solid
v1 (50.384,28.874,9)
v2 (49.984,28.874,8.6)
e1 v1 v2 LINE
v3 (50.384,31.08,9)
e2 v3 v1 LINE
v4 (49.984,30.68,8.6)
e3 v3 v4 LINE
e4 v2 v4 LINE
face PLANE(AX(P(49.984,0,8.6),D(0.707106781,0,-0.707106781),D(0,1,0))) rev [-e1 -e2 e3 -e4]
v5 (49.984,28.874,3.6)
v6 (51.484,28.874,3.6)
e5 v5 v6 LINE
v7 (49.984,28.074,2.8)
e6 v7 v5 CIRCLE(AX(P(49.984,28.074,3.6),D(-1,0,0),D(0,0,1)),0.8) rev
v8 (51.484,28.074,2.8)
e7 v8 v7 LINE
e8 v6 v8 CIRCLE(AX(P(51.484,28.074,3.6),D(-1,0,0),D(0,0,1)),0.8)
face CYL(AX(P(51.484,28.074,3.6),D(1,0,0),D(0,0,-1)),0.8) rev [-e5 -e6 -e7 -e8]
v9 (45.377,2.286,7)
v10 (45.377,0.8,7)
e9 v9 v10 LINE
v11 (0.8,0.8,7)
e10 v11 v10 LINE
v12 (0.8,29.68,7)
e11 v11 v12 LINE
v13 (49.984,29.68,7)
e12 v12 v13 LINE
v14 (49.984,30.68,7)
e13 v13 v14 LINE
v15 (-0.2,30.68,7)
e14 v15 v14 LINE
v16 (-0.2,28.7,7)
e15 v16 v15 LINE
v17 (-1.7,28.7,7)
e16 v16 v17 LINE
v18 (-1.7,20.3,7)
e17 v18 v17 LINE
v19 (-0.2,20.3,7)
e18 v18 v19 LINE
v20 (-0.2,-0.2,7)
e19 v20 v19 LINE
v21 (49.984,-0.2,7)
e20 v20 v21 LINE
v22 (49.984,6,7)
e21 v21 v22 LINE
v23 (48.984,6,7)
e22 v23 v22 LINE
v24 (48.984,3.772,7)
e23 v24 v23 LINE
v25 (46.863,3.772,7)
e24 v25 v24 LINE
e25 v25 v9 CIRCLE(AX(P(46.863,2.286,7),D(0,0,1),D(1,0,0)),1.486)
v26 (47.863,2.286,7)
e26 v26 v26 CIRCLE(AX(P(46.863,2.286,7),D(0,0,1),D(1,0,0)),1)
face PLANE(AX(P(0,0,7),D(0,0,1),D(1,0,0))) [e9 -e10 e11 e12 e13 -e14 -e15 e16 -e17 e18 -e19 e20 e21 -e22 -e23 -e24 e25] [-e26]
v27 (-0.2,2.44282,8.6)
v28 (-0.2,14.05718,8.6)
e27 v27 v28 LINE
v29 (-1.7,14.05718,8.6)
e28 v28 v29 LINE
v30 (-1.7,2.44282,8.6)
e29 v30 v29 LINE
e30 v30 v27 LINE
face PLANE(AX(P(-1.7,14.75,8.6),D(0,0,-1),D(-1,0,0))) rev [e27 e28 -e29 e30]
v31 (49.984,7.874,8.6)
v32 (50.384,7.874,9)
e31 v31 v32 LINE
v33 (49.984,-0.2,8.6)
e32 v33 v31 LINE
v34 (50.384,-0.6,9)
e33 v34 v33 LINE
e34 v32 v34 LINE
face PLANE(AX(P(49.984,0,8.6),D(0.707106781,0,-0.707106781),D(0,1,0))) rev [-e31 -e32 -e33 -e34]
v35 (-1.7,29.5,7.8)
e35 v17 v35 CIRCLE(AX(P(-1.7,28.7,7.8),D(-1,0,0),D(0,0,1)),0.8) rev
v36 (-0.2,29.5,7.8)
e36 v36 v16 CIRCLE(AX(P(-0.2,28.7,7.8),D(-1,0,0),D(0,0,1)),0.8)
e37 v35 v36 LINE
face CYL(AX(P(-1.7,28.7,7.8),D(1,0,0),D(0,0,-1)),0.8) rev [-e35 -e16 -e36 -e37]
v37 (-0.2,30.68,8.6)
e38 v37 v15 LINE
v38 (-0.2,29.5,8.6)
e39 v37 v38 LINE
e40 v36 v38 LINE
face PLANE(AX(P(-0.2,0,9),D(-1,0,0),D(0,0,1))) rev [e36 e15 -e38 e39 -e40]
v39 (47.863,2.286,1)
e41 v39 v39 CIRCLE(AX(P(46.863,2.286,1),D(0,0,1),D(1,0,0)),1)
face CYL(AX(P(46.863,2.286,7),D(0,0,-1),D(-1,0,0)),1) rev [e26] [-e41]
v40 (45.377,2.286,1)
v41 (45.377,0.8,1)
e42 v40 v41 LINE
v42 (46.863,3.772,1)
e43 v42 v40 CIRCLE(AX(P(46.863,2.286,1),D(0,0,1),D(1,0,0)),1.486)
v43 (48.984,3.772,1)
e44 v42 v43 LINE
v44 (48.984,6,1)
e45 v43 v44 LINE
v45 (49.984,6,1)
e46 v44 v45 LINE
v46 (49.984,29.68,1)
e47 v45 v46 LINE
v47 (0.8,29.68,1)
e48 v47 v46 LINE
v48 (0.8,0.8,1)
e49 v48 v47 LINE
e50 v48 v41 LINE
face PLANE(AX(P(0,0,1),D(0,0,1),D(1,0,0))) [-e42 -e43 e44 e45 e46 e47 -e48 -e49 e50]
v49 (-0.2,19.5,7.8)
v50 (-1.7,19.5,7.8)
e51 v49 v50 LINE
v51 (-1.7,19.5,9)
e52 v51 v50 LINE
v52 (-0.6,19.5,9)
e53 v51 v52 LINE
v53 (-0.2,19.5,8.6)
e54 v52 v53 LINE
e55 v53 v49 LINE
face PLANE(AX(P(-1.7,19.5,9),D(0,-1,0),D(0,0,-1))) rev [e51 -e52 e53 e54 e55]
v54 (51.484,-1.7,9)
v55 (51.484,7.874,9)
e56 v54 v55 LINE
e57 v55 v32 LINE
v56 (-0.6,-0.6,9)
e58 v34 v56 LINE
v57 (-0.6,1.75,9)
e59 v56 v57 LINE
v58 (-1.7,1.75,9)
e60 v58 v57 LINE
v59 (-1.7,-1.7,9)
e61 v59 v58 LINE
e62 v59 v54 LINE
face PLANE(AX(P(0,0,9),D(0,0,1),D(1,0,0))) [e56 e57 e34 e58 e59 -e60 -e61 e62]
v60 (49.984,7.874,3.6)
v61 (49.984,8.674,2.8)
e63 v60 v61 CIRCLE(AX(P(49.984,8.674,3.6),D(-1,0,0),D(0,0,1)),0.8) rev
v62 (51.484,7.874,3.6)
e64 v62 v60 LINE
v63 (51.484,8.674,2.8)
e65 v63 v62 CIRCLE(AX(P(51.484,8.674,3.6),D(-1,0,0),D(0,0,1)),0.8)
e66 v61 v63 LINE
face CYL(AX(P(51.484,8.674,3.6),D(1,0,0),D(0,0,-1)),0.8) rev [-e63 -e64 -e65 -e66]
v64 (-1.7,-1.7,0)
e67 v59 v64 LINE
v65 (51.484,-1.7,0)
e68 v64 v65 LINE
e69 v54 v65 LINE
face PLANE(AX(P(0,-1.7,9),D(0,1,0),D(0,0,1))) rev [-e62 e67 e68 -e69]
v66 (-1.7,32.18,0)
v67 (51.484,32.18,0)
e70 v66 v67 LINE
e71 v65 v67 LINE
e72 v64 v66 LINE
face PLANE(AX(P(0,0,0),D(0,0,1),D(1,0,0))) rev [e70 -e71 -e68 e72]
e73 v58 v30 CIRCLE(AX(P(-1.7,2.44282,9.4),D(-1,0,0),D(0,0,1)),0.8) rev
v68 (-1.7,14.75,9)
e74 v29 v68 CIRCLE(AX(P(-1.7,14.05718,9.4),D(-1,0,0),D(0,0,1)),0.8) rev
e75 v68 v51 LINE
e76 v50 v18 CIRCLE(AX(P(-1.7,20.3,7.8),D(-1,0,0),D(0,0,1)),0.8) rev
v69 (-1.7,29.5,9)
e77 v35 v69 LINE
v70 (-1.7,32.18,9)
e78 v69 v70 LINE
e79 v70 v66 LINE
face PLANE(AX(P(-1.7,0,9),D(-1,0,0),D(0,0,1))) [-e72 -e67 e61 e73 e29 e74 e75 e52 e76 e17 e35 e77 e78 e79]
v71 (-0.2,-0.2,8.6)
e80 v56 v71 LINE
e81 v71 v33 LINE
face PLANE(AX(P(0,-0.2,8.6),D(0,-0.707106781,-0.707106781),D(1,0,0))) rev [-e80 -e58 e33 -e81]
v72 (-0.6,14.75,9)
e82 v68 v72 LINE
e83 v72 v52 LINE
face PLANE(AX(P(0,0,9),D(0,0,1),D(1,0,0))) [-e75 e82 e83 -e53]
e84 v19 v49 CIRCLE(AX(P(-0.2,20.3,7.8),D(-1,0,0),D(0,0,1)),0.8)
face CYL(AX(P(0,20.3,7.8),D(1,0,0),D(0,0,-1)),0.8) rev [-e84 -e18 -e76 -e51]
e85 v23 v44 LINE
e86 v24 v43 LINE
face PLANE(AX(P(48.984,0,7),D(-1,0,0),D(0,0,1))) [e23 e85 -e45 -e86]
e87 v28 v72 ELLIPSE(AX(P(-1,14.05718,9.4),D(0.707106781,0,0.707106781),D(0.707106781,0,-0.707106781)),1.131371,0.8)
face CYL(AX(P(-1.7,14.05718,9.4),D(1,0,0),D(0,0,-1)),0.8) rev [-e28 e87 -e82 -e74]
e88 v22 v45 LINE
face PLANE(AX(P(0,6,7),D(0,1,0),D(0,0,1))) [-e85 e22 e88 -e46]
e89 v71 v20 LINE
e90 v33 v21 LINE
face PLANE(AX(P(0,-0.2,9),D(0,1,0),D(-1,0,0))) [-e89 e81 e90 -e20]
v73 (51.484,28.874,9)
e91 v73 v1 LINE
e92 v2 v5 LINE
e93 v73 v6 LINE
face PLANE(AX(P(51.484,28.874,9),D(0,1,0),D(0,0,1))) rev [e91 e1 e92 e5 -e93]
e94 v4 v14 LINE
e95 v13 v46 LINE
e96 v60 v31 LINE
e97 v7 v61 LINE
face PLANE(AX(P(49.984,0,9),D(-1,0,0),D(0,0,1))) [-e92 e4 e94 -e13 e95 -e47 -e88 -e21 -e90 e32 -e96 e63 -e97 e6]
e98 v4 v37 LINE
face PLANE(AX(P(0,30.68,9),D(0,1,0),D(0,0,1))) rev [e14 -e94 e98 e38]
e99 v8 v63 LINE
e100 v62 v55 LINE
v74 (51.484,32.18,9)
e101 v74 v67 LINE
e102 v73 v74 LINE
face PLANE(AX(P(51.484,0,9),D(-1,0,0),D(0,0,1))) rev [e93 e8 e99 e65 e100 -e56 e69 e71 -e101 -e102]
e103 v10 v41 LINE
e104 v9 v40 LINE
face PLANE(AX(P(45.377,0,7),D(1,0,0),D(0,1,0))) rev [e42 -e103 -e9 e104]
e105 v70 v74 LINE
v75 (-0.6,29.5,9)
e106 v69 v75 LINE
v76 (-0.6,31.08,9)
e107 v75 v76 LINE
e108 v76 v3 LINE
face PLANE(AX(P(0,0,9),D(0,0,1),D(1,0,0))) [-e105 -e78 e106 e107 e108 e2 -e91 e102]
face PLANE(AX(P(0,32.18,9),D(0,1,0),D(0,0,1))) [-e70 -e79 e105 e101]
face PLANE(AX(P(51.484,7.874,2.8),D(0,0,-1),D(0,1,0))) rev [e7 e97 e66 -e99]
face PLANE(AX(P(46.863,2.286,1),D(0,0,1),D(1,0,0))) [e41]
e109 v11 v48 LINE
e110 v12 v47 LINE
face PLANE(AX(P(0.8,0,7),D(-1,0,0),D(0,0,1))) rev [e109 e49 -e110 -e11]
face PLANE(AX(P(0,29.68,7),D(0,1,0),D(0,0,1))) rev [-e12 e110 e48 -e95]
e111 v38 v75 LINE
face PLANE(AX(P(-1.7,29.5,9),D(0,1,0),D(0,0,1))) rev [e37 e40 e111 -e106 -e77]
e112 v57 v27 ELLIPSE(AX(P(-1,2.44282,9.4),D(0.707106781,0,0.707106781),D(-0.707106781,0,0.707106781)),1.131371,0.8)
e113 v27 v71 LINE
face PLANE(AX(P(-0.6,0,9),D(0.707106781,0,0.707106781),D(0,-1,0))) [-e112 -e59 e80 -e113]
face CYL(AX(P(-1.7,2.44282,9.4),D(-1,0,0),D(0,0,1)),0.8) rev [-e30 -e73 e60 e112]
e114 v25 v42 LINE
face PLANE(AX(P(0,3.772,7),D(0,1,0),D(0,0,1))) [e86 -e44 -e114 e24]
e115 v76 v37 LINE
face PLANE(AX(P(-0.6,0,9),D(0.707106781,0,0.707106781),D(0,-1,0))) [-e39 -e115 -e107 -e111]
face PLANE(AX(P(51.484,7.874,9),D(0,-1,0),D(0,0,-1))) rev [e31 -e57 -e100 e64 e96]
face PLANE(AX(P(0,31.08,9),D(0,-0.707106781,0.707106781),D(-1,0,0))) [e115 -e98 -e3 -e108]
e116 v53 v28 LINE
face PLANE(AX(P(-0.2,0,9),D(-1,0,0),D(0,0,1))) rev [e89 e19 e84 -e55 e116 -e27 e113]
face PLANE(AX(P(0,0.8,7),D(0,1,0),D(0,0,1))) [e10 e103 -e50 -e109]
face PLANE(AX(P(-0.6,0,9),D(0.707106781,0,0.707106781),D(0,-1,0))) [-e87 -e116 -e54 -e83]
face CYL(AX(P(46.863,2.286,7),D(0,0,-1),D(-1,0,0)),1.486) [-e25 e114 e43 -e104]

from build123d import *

# Parameters (mm, degrees)
EXTRUDE_1_DEPTH     = 1
SKETCH_1_R          = 1
EXTRUDE_1_2_DEPTH   = 1
SKETCH_1_3_R        = 1.486
SKETCH_1_3_R_2      = 1
EXTRUDE_2_DEPTH     = 7
SKETCH_1_4_W        = 53.184
SKETCH_1_4_H        = 33.88
SKETCH_1_4_W_2      = 50.184
SKETCH_1_4_H_2      = 30.88
EXTRUDE_3_DEPTH     = 9
SKETCH_2_W          = 6.2
SKETCH_2_H          = 21
CUT_EXTRUDE_1_DEPTH = 62.545010001
SKETCH_3_W          = 2
SKETCH_3_H          = 10
CUT_EXTRUDE_2_DEPTH = 62.545010001
SKETCH_4_W          = 0.4
SKETCH_4_H          = 13
CUT_EXTRUDE_3_DEPTH = 62.545010001
FILLET_1_R          = 0.8
CHAMFER_1_SIZE      = 0.4


# Some blends are built 0.0001 mm under size
with BuildPart() as part:
    # Эскиз1 → Бобышка-Вытянуть1 (new body)
    with BuildSketch(Plane.XY):
        with BuildLine():
            Line((48.984, 3.772), (48.984, 6))
            Line((48.984, 6), (49.984, 6))
            Line((49.984, 6), (49.984, 29.68))
            Line((49.984, 29.68), (0.8, 29.68))
            Line((0.8, 29.68), (0.8, 0.8))
            Line((0.8, 0.8), (45.377, 0.8))
            Line((45.377, 0.8), (45.377, 2.286))
            ThreePointArc((45.377, 2.286), (45.812239323, 3.336760677), (46.863, 3.772))
            Line((46.863, 3.772), (48.984, 3.772))
        make_face()
    extrude(amount=EXTRUDE_1_DEPTH)



with BuildPart() as body_2:
    # Эскиз1 → Extrude 1 2 (new body)
    with BuildSketch(Plane.XY):
        with Locations((46.863, 2.286)):
            Circle(SKETCH_1_R)
    extrude(amount=EXTRUDE_1_2_DEPTH)


with BuildPart() as part_1:
    add(part.part)

    add(body_2.part)  # Бобышка-Вытянуть2 merges body 2
    # Эскиз1<3> → Бобышка-Вытянуть2 (add)
    # profile 1 of 4: a face of its own
    with BuildSketch(Plane.XY):
        Polygon((0.8, 29.68), (48.984, 29.68), (49.984, 29.68), (49.984, 30.68), (-0.2, 30.68), (-0.2, -0.2), (49.984, -0.2), (49.984, 6), (48.984, 6), (48.984, 3.772), (48.984, 0.8), (46.863, 0.8), (45.377, 0.8), (0.8, 0.8), align=None)
    # profile 2 of 4: a face of its own
    with BuildSketch(Plane.XY):
        with BuildLine():
            Line((48.984, 0.8), (48.984, 3.772))
            Line((48.984, 3.772), (46.863, 3.772))
            ThreePointArc((46.863, 3.772), (47.913760677, 3.336760677), (48.349, 2.286))
            ThreePointArc((48.349, 2.286), (47.913760677, 1.235239323), (46.863, 0.8))
            Line((46.863, 0.8), (48.984, 0.8))
        make_face()
    # profile 3 of 4: a face of its own
    with BuildSketch(Plane.XY):
        with BuildLine():
            Line((45.377, 2.286), (45.377, 0.8))
            Line((45.377, 0.8), (46.863, 0.8))
            ThreePointArc((46.863, 0.8), (45.812239323, 1.235239323), (45.377, 2.286))
        make_face()
    # profile 4 of 4: a face of its own
    with BuildSketch(Plane.XY):
        with Locations((46.863, 2.286)):
            Circle(SKETCH_1_3_R)
        with Locations((46.863, 2.286)):
            Circle(SKETCH_1_3_R_2, mode=Mode.SUBTRACT)
    extrude(amount=EXTRUDE_2_DEPTH)

    # Эскиз1<4> → Бобышка-Вытянуть3 (add)
    with BuildSketch(Plane.XY):
        with Locations((24.892, 15.24)):
            Rectangle(SKETCH_1_4_W, SKETCH_1_4_H)
        with Locations((24.892, 15.24)):
            Rectangle(SKETCH_1_4_W_2, SKETCH_1_4_H_2, mode=Mode.SUBTRACT)
    extrude(amount=EXTRUDE_3_DEPTH)

    # Эскиз2 → Вырез-Вытянуть1 (cut, through all)
    with BuildSketch(Plane.ZY.offset(-49.984)):
        with Locations((5.9, 18.374)):
            Rectangle(SKETCH_2_W, SKETCH_2_H)
    extrude(amount=-CUT_EXTRUDE_1_DEPTH, mode=Mode.SUBTRACT)

    # Эскиз3 → Вырез-Вытянуть2 (cut, through all)
    with BuildSketch(Plane(origin=(-0.2, 0, 0), x_dir=(0, 0, -1), z_dir=(1, 0, 0))):
        with Locations((-8, 24.5)):
            Rectangle(SKETCH_3_W, SKETCH_3_H)
    extrude(amount=-CUT_EXTRUDE_2_DEPTH, mode=Mode.SUBTRACT)

    # Эскиз4 → Вырез-Вытянуть3 (cut, through all)
    with BuildSketch(Plane(origin=(-0.2, 0, 0), x_dir=(0, 0, -1), z_dir=(1, 0, 0))):
        with Locations((-8.8, 8.25)):
            Rectangle(SKETCH_4_W, SKETCH_4_H)
    extrude(amount=-CUT_EXTRUDE_3_DEPTH, mode=Mode.SUBTRACT)

    # Скругление1
    # the kernel refuses this fillet: 0.8 mm, written as the material it adds along each edge
    with BuildSketch(Plane(origin=(49.984, 7.874, 2.8), x_dir=(0, 1, 0), z_dir=(1, 0, 0)), Plane(origin=(49.984, 28.874, 2.8), x_dir=(0, 0, 1), z_dir=(1, 0, 0)), Plane(origin=(-0.2, 19.5, 7), x_dir=(0, 0, 1), z_dir=(-1, 0, 0)), Plane(origin=(-0.2, 29.5, 7), x_dir=(0, -1, 0), z_dir=(-1, 0, 0))) as fillet_1_piece_1:
        with BuildLine():
            CenterArc((FILLET_1_R, FILLET_1_R), FILLET_1_R, 180, 90)
            Line((0, FILLET_1_R), (-FILLET_1_R * 0.02, FILLET_1_R))
            Line((-FILLET_1_R * 0.02, FILLET_1_R), (-FILLET_1_R * 0.02, -FILLET_1_R * 0.02))
            Line((-FILLET_1_R * 0.02, -FILLET_1_R * 0.02), (FILLET_1_R, -FILLET_1_R * 0.02))
            Line((FILLET_1_R, -FILLET_1_R * 0.02), (FILLET_1_R, 0))
        make_face()
    extrude(amount=1.5)
    with BuildSketch(Plane(origin=(-0.2, 1.75, 8.6), x_dir=(0, 0, 1), z_dir=(-1, 0, 0))) as fillet_1_piece_2:
        with BuildLine():
            CenterArc((0.8, 0.692820323), FILLET_1_R, 180, 60)
            Line((0, 0.692820323), (-0.016, 0.692820323))
            Line((-0.016, 0.692820323), (-0.016, 0))
            Line((-0.016, 0), (0, -0.016))
            ThreePointArc((0, -0.016), (0.2, -0.016), (0.392, -0.013856406))
            Line((0.392, -0.013856406), (0.4, 0))
        make_face()
    extrude(amount=1.5)
    with BuildSketch(Plane(origin=(-0.2, 14.75, 8.6), x_dir=(0, -1, 0), z_dir=(-1, 0, 0))) as fillet_1_piece_3:
        with BuildLine():
            CenterArc((0.692820323, 0.8), FILLET_1_R, 210, 60)
            Line((0, 0.4), (-0.013856406, 0.392))
            ThreePointArc((-0.013856406, 0.392), (-0.016, 0.2), (-0.016, 0))
            Line((-0.016, 0), (0, -0.016))
            Line((0, -0.016), (0.692820323, -0.016))
            Line((0.692820323, -0.016), (0.692820323, 0))
        make_face()
    extrude(amount=1.5)

    # Фаска1
    chamfer_1_edges = [part_1.edges().sort_by_distance(p)[0] for p in [
        (-0.2, 17.125, 9),
        (-0.2, 0.775, 9),
        (24.892, -0.2, 9),
        (49.984, 3.837, 9),
        (49.984, 29.777, 9),
        (24.892, 30.68, 9),
        (-0.2, 30.09, 9),
    ]]
    chamfer(chamfer_1_edges, length=CHAMFER_1_SIZE - 0.0001)  # a hair under: the kernel refuses the full size


solid = part_1.part
